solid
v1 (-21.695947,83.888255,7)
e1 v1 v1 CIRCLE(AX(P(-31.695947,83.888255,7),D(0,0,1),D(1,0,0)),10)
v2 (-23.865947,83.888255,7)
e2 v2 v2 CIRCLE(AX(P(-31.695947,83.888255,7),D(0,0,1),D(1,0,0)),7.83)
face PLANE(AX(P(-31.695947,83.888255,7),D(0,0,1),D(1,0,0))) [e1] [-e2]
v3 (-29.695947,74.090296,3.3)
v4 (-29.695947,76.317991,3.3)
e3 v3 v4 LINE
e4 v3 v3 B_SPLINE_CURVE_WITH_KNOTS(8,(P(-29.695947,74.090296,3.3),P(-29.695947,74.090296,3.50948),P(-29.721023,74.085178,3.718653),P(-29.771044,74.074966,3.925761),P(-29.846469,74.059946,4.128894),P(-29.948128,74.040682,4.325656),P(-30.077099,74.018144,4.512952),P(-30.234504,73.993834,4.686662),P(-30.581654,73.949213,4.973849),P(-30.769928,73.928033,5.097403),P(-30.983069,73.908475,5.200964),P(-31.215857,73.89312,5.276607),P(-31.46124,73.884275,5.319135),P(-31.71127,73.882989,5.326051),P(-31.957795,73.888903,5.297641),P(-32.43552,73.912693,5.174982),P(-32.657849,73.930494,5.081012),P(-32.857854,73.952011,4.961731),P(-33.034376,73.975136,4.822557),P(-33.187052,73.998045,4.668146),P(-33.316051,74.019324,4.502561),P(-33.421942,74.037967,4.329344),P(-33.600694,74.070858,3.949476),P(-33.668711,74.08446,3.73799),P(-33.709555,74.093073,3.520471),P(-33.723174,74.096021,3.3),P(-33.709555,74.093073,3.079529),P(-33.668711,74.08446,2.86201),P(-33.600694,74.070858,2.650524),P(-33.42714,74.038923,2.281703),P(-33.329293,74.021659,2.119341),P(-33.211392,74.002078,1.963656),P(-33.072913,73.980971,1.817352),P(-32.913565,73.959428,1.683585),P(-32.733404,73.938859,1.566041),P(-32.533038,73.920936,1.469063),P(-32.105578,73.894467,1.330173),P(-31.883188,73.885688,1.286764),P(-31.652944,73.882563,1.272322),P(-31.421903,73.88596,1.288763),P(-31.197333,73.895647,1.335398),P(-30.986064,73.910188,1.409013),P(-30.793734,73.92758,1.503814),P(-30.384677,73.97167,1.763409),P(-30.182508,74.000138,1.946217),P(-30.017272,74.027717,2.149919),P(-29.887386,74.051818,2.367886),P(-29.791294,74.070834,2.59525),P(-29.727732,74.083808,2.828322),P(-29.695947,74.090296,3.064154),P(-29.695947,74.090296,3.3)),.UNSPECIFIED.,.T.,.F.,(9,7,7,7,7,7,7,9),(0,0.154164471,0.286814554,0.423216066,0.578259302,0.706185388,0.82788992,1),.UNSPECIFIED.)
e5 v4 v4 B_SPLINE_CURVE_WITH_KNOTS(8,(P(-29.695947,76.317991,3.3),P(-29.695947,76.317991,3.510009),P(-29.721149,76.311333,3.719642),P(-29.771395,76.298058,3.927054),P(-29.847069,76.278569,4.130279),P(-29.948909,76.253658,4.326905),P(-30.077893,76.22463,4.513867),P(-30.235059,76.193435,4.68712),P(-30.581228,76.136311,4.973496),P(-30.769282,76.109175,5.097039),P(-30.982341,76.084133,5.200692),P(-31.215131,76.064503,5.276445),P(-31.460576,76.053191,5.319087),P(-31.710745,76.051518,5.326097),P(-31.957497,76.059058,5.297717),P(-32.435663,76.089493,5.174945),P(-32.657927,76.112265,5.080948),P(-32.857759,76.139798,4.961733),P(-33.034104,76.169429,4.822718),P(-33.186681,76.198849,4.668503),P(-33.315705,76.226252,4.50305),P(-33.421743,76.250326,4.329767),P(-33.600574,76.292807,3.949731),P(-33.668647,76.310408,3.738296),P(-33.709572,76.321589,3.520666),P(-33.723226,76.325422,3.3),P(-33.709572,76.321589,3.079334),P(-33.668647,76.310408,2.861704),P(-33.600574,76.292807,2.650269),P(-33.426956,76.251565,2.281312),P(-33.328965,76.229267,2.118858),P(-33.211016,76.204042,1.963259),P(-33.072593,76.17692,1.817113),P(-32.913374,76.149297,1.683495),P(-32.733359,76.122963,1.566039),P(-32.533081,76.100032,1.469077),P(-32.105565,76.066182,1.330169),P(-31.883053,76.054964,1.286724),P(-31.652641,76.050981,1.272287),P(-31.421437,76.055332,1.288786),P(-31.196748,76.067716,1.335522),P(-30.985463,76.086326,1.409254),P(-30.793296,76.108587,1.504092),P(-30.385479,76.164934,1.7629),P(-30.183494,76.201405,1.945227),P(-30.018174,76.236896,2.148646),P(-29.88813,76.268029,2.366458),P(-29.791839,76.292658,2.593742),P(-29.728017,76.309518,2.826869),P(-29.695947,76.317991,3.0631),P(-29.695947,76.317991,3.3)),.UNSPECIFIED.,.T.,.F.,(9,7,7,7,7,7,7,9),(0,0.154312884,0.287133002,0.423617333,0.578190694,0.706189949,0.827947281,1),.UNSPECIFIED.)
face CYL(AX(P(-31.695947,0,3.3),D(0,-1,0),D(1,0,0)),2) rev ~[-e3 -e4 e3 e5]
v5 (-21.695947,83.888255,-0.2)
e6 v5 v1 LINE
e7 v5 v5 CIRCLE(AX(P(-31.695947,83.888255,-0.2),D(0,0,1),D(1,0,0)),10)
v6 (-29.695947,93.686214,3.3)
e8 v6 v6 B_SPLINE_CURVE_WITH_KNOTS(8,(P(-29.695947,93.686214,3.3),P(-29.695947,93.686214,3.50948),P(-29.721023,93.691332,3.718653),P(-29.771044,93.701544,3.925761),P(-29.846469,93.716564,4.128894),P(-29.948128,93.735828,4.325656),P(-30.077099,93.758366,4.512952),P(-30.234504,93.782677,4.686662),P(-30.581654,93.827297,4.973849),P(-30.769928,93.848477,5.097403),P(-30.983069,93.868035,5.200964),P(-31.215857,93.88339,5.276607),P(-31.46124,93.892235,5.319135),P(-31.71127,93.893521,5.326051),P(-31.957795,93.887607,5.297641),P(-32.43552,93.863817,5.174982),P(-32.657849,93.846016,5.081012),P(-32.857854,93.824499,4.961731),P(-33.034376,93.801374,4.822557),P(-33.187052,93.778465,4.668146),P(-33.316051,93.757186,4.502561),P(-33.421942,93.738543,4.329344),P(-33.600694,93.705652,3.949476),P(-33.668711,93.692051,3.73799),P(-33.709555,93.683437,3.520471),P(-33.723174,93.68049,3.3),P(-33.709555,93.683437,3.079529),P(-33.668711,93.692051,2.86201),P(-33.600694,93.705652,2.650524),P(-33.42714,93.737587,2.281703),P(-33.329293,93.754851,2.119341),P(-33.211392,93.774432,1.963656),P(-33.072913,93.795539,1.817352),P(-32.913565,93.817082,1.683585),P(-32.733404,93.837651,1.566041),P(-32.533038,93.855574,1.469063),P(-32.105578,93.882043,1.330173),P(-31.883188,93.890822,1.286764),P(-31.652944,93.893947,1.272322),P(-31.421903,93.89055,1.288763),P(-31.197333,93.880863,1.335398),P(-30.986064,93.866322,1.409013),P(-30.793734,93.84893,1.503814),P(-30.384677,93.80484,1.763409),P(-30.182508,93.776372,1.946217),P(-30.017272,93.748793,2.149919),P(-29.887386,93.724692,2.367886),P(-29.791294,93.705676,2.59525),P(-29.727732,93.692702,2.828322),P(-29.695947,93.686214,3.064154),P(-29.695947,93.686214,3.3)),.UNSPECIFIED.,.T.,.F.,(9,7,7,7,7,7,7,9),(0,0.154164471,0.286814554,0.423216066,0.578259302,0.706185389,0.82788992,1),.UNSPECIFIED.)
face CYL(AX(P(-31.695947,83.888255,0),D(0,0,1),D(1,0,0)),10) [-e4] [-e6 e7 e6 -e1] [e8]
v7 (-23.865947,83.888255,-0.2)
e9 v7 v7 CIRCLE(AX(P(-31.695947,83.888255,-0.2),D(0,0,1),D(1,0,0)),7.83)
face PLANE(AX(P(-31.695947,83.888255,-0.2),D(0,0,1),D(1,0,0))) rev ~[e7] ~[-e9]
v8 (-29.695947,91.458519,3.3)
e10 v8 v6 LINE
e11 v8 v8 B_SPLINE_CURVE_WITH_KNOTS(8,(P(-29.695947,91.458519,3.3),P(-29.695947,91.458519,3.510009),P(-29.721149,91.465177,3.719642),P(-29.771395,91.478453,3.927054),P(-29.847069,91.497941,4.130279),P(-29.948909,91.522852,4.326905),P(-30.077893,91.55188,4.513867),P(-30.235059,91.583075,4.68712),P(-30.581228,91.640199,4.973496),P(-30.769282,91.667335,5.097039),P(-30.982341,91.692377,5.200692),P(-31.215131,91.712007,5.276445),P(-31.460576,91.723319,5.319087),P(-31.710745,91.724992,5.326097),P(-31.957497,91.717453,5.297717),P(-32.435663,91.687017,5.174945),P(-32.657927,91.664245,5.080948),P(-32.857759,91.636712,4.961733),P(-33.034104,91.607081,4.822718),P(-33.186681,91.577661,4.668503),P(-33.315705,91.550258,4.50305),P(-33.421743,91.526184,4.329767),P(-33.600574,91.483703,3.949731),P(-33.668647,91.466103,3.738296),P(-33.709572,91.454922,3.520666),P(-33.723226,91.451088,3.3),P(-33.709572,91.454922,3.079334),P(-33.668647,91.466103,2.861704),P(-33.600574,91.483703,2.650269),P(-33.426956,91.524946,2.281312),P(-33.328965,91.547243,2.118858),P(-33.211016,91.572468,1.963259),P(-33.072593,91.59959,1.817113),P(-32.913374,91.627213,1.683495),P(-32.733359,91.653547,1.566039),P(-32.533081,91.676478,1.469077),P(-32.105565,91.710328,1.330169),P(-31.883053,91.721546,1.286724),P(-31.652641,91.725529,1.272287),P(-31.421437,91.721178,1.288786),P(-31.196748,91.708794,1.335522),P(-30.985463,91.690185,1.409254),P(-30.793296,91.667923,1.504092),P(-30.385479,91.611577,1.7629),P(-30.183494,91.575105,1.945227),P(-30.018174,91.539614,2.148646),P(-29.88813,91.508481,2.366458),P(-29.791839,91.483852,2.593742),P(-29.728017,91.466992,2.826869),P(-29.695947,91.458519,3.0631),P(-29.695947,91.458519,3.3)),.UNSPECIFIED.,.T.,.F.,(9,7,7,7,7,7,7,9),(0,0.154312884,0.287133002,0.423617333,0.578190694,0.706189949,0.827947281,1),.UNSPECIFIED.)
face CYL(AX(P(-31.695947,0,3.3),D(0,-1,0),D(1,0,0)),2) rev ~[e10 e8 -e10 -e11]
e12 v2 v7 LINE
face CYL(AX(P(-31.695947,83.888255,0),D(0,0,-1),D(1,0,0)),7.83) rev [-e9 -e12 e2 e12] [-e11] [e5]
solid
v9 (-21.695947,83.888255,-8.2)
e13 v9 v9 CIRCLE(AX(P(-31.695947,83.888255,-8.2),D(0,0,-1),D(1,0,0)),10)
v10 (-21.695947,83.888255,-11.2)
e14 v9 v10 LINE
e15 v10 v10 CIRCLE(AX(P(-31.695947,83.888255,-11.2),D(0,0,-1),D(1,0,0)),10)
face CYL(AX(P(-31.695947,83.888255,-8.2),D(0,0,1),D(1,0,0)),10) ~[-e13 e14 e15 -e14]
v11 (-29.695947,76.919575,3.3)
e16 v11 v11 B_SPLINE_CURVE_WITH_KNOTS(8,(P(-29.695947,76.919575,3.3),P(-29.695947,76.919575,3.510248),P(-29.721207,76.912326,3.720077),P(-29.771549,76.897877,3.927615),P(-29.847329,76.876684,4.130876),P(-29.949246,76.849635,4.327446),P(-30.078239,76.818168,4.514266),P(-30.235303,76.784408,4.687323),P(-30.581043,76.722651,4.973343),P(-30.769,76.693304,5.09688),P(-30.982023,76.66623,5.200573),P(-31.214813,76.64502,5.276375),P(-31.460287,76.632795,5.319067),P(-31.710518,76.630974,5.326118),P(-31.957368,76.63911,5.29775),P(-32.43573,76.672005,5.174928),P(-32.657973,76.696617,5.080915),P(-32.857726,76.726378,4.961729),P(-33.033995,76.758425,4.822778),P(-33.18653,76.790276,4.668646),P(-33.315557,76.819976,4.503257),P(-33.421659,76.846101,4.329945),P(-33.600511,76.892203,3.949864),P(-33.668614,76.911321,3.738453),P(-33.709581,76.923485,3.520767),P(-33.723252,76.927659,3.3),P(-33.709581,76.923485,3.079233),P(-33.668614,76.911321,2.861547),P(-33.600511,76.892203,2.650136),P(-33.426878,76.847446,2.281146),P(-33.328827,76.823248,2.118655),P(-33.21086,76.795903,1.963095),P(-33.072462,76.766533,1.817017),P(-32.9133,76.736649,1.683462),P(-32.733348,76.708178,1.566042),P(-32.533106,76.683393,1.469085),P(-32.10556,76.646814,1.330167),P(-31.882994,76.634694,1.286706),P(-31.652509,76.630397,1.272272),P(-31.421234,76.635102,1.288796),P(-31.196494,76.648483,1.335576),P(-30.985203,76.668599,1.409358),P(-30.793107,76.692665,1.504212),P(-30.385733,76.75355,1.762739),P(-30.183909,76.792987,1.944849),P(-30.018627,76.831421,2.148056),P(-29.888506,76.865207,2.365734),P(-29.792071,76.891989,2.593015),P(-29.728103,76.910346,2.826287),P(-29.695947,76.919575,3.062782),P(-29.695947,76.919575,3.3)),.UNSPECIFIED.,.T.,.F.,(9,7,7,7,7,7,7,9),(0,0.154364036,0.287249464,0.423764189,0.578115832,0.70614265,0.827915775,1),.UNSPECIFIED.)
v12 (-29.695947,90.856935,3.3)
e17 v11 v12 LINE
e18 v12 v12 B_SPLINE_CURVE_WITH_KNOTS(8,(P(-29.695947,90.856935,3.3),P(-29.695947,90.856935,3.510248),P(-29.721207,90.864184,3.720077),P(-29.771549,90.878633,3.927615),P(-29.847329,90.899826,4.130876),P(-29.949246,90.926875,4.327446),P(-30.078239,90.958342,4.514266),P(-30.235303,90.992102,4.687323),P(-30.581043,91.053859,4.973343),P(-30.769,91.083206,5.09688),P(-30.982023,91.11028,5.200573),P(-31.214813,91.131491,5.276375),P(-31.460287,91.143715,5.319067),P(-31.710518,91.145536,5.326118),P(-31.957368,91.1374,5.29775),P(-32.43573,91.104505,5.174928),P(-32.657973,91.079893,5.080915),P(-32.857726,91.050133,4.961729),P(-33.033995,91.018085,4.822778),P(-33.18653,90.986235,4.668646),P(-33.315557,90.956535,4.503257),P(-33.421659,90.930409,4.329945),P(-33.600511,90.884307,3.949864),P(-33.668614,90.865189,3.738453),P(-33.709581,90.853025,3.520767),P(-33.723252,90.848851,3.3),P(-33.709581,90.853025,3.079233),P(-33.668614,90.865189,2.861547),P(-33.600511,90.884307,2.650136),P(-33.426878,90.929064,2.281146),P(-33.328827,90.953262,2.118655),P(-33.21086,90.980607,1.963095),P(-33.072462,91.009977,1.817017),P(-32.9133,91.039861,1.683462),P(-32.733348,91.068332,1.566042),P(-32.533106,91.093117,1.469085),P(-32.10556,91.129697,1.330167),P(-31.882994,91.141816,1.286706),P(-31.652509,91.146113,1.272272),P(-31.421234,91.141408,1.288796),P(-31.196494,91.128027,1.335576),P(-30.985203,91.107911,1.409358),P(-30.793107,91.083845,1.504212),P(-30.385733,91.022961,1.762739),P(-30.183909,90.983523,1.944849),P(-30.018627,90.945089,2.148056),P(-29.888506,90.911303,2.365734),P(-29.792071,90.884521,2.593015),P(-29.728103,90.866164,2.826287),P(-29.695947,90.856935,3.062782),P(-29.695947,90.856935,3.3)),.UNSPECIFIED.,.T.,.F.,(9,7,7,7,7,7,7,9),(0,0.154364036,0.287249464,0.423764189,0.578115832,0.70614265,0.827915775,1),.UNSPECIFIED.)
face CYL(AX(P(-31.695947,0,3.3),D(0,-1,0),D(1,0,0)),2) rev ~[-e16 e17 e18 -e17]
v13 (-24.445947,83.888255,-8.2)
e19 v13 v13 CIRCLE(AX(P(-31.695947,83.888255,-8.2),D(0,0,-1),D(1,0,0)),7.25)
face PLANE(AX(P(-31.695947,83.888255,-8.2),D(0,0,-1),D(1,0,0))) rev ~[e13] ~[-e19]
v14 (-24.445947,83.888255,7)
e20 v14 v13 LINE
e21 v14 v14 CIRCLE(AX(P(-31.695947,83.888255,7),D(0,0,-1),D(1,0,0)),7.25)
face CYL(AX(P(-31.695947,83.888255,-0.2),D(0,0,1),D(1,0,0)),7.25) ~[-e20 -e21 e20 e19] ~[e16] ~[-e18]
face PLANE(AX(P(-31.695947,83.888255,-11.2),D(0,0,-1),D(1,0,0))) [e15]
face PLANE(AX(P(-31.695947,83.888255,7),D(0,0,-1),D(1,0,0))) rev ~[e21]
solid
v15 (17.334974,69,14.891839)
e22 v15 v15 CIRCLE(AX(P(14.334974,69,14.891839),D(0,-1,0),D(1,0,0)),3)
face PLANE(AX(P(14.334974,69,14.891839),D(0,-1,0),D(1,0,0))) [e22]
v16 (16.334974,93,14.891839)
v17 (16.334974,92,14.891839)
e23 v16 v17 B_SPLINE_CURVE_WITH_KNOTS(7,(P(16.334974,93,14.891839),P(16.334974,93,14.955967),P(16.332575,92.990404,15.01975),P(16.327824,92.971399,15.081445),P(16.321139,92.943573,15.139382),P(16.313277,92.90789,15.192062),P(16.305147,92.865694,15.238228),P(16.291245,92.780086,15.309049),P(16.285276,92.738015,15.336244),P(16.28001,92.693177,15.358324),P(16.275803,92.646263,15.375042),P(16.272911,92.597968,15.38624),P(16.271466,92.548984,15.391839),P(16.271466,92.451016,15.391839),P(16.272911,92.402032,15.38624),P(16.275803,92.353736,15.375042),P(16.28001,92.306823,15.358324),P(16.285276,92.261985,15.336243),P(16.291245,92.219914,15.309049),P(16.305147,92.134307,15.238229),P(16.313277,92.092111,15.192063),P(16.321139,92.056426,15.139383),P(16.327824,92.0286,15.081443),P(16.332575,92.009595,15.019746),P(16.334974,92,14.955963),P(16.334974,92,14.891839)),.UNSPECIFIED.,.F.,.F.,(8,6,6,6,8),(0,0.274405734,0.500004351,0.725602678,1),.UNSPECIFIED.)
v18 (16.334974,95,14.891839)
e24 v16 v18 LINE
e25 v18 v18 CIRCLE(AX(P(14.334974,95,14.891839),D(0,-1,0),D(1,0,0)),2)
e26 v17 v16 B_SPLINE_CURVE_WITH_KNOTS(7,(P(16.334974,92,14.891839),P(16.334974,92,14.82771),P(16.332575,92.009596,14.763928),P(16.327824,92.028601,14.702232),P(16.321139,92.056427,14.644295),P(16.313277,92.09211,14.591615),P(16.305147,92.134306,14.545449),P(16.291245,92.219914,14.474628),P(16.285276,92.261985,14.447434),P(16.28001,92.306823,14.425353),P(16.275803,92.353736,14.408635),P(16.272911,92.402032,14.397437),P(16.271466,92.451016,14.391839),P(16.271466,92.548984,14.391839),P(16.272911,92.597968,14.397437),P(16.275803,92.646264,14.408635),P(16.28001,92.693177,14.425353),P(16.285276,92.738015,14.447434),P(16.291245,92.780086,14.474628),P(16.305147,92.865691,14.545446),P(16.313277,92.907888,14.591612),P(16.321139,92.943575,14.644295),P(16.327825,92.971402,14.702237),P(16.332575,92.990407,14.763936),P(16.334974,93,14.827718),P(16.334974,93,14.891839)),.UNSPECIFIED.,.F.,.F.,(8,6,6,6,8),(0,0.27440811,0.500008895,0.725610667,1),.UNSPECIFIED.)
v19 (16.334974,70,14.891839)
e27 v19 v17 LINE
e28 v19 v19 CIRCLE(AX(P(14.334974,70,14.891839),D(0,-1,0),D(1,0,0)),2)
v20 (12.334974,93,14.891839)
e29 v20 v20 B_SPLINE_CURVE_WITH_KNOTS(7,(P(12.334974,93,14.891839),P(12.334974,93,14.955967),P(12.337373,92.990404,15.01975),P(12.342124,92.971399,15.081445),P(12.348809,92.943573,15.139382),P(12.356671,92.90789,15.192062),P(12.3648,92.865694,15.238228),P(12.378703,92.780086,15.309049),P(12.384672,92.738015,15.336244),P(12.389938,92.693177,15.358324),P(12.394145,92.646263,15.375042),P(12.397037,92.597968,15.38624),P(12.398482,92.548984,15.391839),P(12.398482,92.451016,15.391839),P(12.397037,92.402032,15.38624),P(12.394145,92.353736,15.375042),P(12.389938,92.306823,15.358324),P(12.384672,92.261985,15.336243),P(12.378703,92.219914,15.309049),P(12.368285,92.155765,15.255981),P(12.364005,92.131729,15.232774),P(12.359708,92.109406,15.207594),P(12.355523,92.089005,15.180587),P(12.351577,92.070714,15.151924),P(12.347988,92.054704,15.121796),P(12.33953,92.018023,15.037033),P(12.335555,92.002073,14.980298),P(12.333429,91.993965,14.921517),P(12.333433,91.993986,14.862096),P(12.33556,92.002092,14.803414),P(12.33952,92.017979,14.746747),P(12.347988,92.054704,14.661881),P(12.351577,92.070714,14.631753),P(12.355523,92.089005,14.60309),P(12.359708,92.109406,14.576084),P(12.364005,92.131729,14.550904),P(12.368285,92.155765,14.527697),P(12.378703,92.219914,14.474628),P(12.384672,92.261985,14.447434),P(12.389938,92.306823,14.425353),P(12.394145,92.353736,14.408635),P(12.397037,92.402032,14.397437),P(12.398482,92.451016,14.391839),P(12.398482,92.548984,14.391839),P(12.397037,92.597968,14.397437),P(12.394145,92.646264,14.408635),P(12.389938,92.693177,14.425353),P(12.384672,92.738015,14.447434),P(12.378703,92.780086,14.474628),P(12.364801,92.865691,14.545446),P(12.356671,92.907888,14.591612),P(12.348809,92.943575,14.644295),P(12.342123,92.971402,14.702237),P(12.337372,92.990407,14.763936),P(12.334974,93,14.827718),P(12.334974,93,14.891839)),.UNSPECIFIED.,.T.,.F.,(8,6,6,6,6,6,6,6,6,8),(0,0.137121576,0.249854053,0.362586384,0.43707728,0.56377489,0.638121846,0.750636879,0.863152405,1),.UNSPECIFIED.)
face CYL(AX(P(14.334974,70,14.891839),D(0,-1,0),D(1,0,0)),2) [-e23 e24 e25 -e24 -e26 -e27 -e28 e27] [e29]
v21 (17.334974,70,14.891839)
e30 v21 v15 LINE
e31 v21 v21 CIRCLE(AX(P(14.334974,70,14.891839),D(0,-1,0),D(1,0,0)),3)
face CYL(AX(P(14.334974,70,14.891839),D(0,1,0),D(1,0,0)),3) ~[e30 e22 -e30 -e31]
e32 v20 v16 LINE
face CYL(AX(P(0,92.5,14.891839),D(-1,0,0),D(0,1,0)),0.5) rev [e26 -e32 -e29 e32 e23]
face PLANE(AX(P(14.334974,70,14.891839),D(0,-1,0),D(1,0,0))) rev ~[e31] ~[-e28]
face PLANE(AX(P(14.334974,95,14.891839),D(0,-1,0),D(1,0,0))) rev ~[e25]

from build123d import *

# Parameters (mm, degrees)
F0_R          = 10
F0_R_2        = 7.83
F1_DEPTH      = 7
F1_DEPTH_BACK = 0.2
F3_R          = 7.25
F4_DEPTH      = 7.2
F4_DEPTH_BACK = 8
F5_START      = 8
F3_R_2        = 10
F3_R_3        = 7.83
F5_DEPTH      = 3
F2_R          = 2
F10_DEPTH     = 93.8892550597
F7_R          = 2
F11_DEPTH     = 25
F7_R_2        = 3
F12_DEPTH     = 1
F13_R         = 0.5
F14_DEPTH     = 25


# Not quite as in the source:
# - a feature of the source that left no trace in its solid (it failed there, or was rolled back) is left out


with BuildPart() as f1:
    # F0 (on Top) → F1 (new body, two sides)
    with BuildSketch(Plane.XY) as f1_sk:
        with Locations((-31.695947051, 83.8882550597)):
            Circle(F0_R)
        with Locations((-31.695947051, 83.8882550597)):
            Circle(F0_R_2, mode=Mode.SUBTRACT)
    extrude(amount=F1_DEPTH)
    extrude(f1_sk.sketch, amount=-F1_DEPTH_BACK)


with BuildPart() as f4:
    # F3 (on face) → F4 (new body, two sides)
    with BuildSketch(Plane(origin=(0, 0, -0.2), x_dir=(1, 0, 0), z_dir=(0, 0, -1))) as f4_sk:
        with Locations((-31.695947051, -83.8882550597)):
            Circle(F3_R)
    extrude(amount=-F4_DEPTH)
    extrude(f4_sk.sketch, amount=F4_DEPTH_BACK)

    # F3 (on face) → F5 (join)
    with BuildSketch(Plane(origin=(0, 0, -0.2), x_dir=(1, 0, 0), z_dir=(0, 0, -1)).offset(F5_START)):
        with Locations((-31.695947051, -83.8882550597)):
            Circle(F3_R_2)
        with Locations((-31.695947051, -83.8882550597)):
            Circle(F3_R_3, mode=Mode.SUBTRACT)
        with Locations((-31.695947051, -83.8882550597)):
            Circle(F3_R_3)
        with Locations((-31.695947051, -83.8882550597)):
            Circle(F3_R, mode=Mode.SUBTRACT)
        with Locations((-31.695947051, -83.8882550597)):
            Circle(F3_R)
    extrude(amount=F5_DEPTH)


with BuildPart() as f10_tool:
    # F2 (on Front) → F10 (new body, through all)
    with BuildSketch(Plane.XZ):
        with Locations((-31.695947051, 3.3)):
            Circle(F2_R)
    extrude(amount=-F10_DEPTH)


with BuildPart() as f1_1:
    add(f1.part)

    # F10: cut by f10_tool
    add(f10_tool.part, mode=Mode.SUBTRACT)


with BuildPart() as f4_1:
    add(f4.part)

    # F10: cut by f10_tool
    add(f10_tool.part, mode=Mode.SUBTRACT)


with BuildPart() as f11:
    # F7 (on offset) → F11 (new body)
    with BuildSketch(Plane.XZ.offset(-70)):
        with Locations((14.3349738792, 14.8918386549)):
            Circle(F7_R)
    extrude(amount=-F11_DEPTH)

    # F7 (on offset) → F12 (join)
    with BuildSketch(Plane.XZ.offset(-70)):
        with Locations((14.3349738792, 14.8918386549)):
            Circle(F7_R_2)
        with Locations((14.3349738792, 14.8918386549)):
            Circle(F7_R, mode=Mode.SUBTRACT)
        with Locations((14.3349738792, 14.8918386549)):
            Circle(F7_R)
    extrude(amount=F12_DEPTH)

    # F13 (on Right) → F14 (cut)
    with BuildSketch(Plane.YZ):
        with Locations((92.5, 14.8918386549)):
            Circle(F13_R)
    extrude(amount=F14_DEPTH, mode=Mode.SUBTRACT)


solid = Compound([f1_1.part, f4_1.part, f11.part])
